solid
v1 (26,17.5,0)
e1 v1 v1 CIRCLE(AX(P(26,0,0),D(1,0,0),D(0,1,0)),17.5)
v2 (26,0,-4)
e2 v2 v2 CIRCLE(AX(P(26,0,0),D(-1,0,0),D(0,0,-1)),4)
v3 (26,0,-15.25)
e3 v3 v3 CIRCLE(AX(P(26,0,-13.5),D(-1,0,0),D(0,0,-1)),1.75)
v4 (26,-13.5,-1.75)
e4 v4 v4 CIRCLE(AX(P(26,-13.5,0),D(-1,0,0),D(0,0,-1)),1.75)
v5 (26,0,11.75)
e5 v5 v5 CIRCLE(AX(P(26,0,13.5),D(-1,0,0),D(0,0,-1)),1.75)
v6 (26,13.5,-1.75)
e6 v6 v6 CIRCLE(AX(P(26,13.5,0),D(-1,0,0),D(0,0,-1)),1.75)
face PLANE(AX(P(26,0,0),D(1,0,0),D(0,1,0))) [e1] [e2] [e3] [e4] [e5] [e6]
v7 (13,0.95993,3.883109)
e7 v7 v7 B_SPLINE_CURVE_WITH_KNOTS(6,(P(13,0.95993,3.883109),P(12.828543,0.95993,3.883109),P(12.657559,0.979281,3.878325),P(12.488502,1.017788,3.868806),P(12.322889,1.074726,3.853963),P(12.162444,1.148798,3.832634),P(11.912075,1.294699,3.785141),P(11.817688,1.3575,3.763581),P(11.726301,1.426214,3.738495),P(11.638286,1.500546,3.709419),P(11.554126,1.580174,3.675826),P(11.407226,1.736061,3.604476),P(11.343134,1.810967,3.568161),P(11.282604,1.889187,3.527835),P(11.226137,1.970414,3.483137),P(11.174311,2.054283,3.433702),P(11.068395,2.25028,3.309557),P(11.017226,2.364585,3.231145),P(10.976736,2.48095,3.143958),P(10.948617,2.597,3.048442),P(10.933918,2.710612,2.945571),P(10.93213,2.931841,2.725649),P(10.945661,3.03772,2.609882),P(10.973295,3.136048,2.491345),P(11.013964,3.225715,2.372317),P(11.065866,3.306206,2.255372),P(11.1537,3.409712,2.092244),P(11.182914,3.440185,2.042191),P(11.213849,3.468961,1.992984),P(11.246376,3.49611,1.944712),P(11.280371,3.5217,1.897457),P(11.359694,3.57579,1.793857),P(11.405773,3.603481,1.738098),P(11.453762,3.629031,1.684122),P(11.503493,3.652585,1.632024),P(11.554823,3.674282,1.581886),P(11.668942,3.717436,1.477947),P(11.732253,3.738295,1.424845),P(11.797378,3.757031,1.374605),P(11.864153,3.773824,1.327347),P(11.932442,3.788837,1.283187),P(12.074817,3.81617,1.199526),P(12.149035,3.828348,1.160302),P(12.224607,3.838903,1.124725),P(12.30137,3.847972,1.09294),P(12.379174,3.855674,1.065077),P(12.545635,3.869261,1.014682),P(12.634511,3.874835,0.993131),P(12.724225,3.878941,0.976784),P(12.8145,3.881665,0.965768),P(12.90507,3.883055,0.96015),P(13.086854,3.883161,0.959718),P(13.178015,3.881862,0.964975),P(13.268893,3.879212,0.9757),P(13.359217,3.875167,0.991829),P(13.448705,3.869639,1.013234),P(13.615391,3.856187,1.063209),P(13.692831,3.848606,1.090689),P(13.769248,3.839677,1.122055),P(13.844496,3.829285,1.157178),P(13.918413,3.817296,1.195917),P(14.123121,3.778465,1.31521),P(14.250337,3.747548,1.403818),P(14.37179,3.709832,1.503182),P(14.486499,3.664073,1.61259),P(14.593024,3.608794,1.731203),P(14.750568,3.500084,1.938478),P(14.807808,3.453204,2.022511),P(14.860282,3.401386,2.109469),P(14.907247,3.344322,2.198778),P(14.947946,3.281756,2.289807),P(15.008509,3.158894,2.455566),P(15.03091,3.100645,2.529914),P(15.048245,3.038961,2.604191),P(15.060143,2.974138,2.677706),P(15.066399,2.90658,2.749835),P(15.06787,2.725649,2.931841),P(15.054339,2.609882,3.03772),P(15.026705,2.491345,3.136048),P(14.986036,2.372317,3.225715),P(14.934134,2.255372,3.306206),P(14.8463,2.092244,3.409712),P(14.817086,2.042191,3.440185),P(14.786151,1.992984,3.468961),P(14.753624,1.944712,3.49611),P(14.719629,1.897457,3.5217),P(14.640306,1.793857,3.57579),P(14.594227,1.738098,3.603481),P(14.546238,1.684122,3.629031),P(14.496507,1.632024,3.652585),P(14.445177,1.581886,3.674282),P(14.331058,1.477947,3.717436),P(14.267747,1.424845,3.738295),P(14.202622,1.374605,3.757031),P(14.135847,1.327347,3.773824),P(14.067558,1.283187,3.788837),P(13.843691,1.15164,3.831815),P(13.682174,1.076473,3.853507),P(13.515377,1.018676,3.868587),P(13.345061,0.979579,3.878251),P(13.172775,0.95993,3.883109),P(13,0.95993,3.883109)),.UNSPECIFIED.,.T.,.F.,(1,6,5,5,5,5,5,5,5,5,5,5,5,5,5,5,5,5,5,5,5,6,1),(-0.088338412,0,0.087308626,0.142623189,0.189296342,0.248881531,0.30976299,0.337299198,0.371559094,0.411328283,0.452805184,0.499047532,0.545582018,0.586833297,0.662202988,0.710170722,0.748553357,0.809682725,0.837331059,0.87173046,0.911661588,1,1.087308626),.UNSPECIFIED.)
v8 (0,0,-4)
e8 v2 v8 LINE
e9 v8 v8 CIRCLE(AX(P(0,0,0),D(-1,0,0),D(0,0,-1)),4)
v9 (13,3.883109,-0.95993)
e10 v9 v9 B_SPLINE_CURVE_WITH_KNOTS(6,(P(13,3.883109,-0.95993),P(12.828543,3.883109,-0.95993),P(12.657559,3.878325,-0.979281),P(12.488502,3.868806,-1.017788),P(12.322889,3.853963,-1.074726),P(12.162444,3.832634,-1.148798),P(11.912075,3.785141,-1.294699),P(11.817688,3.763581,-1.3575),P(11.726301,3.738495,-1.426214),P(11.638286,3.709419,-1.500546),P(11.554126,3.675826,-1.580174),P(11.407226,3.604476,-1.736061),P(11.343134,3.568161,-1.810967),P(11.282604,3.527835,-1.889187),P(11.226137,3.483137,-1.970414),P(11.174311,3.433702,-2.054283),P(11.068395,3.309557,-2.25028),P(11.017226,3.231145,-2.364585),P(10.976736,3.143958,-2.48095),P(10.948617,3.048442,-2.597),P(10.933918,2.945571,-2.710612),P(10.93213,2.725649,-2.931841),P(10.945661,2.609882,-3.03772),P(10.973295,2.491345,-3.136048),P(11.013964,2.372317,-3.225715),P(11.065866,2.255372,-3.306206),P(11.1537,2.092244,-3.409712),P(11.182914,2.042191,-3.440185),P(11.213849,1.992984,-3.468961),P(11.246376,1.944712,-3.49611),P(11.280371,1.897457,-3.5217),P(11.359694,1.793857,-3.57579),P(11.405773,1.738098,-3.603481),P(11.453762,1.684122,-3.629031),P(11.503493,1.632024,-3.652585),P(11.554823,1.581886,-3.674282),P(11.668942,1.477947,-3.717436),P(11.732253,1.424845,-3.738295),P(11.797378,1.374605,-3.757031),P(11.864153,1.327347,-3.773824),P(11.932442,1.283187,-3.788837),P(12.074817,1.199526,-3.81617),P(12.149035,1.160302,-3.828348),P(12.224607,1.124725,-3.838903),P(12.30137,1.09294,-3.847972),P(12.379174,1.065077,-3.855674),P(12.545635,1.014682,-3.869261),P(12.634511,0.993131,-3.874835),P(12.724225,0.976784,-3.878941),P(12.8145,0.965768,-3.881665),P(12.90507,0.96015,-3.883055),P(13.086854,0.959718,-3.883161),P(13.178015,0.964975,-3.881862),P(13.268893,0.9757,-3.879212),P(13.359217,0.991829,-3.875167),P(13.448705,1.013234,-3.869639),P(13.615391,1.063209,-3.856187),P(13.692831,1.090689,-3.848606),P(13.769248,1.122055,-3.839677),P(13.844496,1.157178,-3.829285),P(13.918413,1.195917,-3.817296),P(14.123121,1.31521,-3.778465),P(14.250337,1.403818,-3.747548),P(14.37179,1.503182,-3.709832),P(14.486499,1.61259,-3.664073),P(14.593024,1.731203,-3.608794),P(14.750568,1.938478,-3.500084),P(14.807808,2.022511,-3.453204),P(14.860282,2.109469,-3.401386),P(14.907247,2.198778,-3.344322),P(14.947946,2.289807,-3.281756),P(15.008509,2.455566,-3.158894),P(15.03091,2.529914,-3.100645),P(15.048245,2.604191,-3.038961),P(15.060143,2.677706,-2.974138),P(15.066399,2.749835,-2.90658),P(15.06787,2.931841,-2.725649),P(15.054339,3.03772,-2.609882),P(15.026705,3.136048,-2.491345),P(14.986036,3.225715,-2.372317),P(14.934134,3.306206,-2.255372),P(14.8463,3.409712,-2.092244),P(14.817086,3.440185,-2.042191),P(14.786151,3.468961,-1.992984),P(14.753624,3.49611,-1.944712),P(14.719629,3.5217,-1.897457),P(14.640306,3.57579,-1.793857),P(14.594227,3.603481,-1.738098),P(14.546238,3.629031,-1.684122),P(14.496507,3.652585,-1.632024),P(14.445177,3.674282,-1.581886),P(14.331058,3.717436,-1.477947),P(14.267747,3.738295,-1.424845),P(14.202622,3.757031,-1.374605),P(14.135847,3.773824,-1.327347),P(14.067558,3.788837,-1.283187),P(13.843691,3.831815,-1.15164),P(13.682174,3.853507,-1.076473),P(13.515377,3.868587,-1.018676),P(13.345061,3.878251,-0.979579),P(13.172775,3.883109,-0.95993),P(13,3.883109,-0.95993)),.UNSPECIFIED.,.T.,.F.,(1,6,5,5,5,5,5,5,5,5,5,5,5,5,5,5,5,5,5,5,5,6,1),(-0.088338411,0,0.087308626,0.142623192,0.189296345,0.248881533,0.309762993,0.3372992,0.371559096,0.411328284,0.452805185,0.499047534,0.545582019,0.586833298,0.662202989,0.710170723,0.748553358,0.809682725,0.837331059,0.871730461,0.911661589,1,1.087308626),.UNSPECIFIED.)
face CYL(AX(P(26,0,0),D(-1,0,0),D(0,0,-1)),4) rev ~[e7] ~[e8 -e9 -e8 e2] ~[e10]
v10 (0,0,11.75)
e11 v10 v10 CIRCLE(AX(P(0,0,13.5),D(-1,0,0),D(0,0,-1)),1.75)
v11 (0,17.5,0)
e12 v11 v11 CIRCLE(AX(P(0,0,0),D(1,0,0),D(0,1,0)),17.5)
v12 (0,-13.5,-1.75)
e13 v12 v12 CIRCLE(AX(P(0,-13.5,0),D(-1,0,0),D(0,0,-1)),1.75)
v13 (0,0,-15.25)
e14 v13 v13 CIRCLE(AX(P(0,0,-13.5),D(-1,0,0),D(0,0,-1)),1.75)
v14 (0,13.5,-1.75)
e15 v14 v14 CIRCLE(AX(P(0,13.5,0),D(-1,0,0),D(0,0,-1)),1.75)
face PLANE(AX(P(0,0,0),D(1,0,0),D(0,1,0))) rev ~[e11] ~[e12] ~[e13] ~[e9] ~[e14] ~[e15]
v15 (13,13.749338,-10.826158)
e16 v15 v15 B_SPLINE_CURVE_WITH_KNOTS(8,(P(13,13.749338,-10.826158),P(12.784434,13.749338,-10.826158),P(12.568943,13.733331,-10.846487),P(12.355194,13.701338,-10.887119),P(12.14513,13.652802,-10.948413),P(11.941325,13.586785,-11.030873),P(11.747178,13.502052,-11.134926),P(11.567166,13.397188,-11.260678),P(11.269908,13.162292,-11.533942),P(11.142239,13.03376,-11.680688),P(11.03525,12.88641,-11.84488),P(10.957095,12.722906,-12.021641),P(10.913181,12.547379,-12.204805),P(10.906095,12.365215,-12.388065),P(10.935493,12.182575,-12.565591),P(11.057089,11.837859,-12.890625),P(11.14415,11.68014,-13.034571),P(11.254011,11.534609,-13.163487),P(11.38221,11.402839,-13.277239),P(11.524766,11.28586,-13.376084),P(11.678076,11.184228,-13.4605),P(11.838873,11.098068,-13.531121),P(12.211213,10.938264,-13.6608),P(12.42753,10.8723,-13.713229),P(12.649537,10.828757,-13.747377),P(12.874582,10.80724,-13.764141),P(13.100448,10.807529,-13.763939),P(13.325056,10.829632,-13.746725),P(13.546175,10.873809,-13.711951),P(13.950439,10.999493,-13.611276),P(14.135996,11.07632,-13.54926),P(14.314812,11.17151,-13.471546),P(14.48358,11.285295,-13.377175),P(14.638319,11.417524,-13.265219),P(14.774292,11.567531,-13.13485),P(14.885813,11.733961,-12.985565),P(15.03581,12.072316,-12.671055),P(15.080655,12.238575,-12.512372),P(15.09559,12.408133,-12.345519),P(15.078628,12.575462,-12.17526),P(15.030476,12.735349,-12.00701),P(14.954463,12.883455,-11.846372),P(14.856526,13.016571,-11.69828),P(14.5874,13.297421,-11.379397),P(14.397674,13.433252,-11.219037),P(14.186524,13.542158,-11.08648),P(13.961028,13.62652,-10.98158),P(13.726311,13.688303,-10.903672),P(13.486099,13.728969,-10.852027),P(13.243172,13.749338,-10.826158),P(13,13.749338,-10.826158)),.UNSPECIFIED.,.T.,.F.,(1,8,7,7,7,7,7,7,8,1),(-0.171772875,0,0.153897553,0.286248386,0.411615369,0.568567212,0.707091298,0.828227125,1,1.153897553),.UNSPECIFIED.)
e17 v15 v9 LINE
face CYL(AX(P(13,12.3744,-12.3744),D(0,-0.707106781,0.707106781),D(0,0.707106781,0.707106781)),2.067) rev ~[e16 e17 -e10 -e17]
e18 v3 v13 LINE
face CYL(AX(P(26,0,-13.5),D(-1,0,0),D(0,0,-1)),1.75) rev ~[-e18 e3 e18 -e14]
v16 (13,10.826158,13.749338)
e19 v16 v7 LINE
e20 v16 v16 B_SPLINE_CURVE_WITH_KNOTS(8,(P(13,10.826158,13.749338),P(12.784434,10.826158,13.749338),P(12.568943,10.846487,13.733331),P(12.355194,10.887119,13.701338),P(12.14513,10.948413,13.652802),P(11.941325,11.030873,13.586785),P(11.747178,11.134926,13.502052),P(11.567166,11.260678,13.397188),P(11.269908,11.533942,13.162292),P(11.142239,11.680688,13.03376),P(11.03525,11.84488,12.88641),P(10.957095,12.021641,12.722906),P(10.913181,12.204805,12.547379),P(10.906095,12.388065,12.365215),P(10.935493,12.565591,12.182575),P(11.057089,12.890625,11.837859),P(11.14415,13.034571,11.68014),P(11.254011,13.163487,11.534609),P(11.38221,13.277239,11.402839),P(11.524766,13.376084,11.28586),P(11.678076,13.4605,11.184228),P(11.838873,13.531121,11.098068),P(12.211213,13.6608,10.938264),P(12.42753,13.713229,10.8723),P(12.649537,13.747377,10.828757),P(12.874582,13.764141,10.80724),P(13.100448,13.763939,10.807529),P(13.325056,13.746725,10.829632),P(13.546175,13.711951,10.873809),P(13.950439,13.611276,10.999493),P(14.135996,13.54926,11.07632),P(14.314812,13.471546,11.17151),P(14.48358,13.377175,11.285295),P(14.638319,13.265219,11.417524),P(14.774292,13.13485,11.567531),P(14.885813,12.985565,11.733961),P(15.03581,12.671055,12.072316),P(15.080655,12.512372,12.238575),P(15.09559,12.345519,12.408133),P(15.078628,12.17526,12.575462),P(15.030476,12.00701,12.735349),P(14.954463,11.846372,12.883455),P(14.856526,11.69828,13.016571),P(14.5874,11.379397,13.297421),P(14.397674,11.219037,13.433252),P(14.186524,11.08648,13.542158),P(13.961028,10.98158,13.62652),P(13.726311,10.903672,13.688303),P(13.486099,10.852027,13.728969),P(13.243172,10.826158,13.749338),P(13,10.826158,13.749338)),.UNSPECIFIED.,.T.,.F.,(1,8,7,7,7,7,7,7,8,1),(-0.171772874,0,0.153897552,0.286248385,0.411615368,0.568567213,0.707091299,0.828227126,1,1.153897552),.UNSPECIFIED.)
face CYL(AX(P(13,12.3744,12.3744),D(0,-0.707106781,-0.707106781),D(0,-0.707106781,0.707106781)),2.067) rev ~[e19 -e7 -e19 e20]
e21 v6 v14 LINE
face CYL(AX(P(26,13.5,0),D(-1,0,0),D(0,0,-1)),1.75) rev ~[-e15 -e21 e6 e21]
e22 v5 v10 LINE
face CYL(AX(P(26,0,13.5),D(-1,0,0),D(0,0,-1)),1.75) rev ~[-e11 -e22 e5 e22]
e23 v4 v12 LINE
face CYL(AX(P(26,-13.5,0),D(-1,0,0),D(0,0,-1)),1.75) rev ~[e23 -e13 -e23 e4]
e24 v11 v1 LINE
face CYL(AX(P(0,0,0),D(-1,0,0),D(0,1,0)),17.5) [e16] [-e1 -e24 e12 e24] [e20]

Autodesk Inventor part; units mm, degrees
ref_plane "YZ Plane" through (0, 0, 0) normal (1, 0, 0) x (0, 1, 0)
sketch "Szkic1" plane through (0, 0, 0) normal (1, 0, 0) x (0, 1, 0)
  circle A0 centre (0, 0) radius 17.5
  dimension "d0" = 35
extrude "Wyciągnięcie proste1" add sketch "Szkic1" along normal blind 26
sketch "Szkic2" plane through (26, 0, 0) normal (1, 0, 0) x (0, 0, -1)
  point P0 (0, 0)
  point P1 (0, 0)
hole "Otwór1" at (26, 0, 0) direction (-1, 0, 0) diameter 8 end through all
sketch "Szkic3" plane through (26, 0, 0) normal (1, 0, 0) x (0, 0, -1)
  point P0 (0, 0)
  point P1 (13.5, 0)
  point P2 (0, 13.5)
  point P3 (-13.5, 0)
  point P4 (0, -13.5)
  dimension "d10" = 13.5
  dimension "d13" = 360
hole "Otwór2" at (26, 0, -13.5) at (26, 13.5, 0) at (26, 0, 13.5) at (26, -13.5, 0) direction (-1, 0, 0) diameter 3.5 depth 26 tip angle 118
sketch "Szkic4" plane through (26, 0, 0) normal (1, 0, 0) x (0, 0, -1)
  line L0 (0, 0) -> (-12.3744, 12.3744)
  line L1 (0, 0) -> (17.5, 0) construction
  line L2 (0, 0) -> (12.3744, 12.3744)
  line L3 (0, 0) -> (17.5, 0) construction
  dimension "d22" = 17.5
  dimension "d23" = 135
  dimension "d24" = 17.5
  dimension "d25" = 45
ref_plane "Płaszczyzna konstrukcyjna1" through (26, 12.3744, 12.3744) normal (0, 0.7071068, 0.7071068) x (-1, 0, 0)
ref_plane "Płaszczyzna konstrukcyjna2" through (26, 12.3744, -12.3744) normal (0, 0.7071068, -0.7071068) x (-1, 0, 0)
sketch "Szkic10" plane through (26, 12.3744, 12.3744) normal (0, 0.7071068, 0.7071068) x (-1, 0, 0)
  line L0 (26, -17.5) -> (26, 17.5) projected
  line L1 (0, 17.5) -> (0, -17.5) projected
  line L2 (26, 17.5) -> (0, 17.5) projected
  line L3 (26, -17.5) -> (0, -17.5) projected
  point P0 (26, 0)
  point P1 (13, 0)
  dimension "d54" = 13
  dimension "d55" = 26
  dimension "d56" = 35
  dimension "d57" = 17.5
hole "Otwór5" at (13, 12.3744, 12.3744) direction (0, -0.7071068, -0.7071068) diameter 4.134 end up to surface thread size "M5x0.8" class "6H" standard "ANSI Metric M Profile"
sketch "Szkic12" plane through (26, 12.3744, -12.3744) normal (0, 0.7071068, -0.7071068) x (-1, 0, 0)
  line L0 (26, 17.5) -> (0, 17.5) projected
  line L1 (26, -17.5) -> (26, 17.5) projected
  line L2 (26, -17.5) -> (0, -17.5) projected
  line L3 (0, 17.5) -> (0, -17.5) projected
  point P0 (26, 0)
  point P1 (13, 0)
  dimension "d67" = 35
  dimension "d68" = 26
  dimension "d69" = 13
  dimension "d70" = 17.5
hole "Otwór6" at (13, 12.3744, -12.3744) direction (0, -0.7071068, 0.7071068) diameter 4.134 end up to surface thread size "M5x0.8" class "6H" standard "ANSI Metric M Profile"
equation "\"d0\" = radius"
equation "\"d16\" = d1"
equation "\"d20\" = d1"
equation "\"d22\" = 0.5 * radius"
equation "\"d24\" = d22"
equation "\"d54\" = 0.5 * d55"
equation "\"d57\" = 0.5 * d56"
equation "\"d69\" = 0.5 * d68"
equation "\"d70\" = 0.5 * d67"
equation "\"radius\" = 35"
equation "\"d1\" = 26"
properties part number "piasta_kola_napedowego_fi8" material "Aluminum 6061"
